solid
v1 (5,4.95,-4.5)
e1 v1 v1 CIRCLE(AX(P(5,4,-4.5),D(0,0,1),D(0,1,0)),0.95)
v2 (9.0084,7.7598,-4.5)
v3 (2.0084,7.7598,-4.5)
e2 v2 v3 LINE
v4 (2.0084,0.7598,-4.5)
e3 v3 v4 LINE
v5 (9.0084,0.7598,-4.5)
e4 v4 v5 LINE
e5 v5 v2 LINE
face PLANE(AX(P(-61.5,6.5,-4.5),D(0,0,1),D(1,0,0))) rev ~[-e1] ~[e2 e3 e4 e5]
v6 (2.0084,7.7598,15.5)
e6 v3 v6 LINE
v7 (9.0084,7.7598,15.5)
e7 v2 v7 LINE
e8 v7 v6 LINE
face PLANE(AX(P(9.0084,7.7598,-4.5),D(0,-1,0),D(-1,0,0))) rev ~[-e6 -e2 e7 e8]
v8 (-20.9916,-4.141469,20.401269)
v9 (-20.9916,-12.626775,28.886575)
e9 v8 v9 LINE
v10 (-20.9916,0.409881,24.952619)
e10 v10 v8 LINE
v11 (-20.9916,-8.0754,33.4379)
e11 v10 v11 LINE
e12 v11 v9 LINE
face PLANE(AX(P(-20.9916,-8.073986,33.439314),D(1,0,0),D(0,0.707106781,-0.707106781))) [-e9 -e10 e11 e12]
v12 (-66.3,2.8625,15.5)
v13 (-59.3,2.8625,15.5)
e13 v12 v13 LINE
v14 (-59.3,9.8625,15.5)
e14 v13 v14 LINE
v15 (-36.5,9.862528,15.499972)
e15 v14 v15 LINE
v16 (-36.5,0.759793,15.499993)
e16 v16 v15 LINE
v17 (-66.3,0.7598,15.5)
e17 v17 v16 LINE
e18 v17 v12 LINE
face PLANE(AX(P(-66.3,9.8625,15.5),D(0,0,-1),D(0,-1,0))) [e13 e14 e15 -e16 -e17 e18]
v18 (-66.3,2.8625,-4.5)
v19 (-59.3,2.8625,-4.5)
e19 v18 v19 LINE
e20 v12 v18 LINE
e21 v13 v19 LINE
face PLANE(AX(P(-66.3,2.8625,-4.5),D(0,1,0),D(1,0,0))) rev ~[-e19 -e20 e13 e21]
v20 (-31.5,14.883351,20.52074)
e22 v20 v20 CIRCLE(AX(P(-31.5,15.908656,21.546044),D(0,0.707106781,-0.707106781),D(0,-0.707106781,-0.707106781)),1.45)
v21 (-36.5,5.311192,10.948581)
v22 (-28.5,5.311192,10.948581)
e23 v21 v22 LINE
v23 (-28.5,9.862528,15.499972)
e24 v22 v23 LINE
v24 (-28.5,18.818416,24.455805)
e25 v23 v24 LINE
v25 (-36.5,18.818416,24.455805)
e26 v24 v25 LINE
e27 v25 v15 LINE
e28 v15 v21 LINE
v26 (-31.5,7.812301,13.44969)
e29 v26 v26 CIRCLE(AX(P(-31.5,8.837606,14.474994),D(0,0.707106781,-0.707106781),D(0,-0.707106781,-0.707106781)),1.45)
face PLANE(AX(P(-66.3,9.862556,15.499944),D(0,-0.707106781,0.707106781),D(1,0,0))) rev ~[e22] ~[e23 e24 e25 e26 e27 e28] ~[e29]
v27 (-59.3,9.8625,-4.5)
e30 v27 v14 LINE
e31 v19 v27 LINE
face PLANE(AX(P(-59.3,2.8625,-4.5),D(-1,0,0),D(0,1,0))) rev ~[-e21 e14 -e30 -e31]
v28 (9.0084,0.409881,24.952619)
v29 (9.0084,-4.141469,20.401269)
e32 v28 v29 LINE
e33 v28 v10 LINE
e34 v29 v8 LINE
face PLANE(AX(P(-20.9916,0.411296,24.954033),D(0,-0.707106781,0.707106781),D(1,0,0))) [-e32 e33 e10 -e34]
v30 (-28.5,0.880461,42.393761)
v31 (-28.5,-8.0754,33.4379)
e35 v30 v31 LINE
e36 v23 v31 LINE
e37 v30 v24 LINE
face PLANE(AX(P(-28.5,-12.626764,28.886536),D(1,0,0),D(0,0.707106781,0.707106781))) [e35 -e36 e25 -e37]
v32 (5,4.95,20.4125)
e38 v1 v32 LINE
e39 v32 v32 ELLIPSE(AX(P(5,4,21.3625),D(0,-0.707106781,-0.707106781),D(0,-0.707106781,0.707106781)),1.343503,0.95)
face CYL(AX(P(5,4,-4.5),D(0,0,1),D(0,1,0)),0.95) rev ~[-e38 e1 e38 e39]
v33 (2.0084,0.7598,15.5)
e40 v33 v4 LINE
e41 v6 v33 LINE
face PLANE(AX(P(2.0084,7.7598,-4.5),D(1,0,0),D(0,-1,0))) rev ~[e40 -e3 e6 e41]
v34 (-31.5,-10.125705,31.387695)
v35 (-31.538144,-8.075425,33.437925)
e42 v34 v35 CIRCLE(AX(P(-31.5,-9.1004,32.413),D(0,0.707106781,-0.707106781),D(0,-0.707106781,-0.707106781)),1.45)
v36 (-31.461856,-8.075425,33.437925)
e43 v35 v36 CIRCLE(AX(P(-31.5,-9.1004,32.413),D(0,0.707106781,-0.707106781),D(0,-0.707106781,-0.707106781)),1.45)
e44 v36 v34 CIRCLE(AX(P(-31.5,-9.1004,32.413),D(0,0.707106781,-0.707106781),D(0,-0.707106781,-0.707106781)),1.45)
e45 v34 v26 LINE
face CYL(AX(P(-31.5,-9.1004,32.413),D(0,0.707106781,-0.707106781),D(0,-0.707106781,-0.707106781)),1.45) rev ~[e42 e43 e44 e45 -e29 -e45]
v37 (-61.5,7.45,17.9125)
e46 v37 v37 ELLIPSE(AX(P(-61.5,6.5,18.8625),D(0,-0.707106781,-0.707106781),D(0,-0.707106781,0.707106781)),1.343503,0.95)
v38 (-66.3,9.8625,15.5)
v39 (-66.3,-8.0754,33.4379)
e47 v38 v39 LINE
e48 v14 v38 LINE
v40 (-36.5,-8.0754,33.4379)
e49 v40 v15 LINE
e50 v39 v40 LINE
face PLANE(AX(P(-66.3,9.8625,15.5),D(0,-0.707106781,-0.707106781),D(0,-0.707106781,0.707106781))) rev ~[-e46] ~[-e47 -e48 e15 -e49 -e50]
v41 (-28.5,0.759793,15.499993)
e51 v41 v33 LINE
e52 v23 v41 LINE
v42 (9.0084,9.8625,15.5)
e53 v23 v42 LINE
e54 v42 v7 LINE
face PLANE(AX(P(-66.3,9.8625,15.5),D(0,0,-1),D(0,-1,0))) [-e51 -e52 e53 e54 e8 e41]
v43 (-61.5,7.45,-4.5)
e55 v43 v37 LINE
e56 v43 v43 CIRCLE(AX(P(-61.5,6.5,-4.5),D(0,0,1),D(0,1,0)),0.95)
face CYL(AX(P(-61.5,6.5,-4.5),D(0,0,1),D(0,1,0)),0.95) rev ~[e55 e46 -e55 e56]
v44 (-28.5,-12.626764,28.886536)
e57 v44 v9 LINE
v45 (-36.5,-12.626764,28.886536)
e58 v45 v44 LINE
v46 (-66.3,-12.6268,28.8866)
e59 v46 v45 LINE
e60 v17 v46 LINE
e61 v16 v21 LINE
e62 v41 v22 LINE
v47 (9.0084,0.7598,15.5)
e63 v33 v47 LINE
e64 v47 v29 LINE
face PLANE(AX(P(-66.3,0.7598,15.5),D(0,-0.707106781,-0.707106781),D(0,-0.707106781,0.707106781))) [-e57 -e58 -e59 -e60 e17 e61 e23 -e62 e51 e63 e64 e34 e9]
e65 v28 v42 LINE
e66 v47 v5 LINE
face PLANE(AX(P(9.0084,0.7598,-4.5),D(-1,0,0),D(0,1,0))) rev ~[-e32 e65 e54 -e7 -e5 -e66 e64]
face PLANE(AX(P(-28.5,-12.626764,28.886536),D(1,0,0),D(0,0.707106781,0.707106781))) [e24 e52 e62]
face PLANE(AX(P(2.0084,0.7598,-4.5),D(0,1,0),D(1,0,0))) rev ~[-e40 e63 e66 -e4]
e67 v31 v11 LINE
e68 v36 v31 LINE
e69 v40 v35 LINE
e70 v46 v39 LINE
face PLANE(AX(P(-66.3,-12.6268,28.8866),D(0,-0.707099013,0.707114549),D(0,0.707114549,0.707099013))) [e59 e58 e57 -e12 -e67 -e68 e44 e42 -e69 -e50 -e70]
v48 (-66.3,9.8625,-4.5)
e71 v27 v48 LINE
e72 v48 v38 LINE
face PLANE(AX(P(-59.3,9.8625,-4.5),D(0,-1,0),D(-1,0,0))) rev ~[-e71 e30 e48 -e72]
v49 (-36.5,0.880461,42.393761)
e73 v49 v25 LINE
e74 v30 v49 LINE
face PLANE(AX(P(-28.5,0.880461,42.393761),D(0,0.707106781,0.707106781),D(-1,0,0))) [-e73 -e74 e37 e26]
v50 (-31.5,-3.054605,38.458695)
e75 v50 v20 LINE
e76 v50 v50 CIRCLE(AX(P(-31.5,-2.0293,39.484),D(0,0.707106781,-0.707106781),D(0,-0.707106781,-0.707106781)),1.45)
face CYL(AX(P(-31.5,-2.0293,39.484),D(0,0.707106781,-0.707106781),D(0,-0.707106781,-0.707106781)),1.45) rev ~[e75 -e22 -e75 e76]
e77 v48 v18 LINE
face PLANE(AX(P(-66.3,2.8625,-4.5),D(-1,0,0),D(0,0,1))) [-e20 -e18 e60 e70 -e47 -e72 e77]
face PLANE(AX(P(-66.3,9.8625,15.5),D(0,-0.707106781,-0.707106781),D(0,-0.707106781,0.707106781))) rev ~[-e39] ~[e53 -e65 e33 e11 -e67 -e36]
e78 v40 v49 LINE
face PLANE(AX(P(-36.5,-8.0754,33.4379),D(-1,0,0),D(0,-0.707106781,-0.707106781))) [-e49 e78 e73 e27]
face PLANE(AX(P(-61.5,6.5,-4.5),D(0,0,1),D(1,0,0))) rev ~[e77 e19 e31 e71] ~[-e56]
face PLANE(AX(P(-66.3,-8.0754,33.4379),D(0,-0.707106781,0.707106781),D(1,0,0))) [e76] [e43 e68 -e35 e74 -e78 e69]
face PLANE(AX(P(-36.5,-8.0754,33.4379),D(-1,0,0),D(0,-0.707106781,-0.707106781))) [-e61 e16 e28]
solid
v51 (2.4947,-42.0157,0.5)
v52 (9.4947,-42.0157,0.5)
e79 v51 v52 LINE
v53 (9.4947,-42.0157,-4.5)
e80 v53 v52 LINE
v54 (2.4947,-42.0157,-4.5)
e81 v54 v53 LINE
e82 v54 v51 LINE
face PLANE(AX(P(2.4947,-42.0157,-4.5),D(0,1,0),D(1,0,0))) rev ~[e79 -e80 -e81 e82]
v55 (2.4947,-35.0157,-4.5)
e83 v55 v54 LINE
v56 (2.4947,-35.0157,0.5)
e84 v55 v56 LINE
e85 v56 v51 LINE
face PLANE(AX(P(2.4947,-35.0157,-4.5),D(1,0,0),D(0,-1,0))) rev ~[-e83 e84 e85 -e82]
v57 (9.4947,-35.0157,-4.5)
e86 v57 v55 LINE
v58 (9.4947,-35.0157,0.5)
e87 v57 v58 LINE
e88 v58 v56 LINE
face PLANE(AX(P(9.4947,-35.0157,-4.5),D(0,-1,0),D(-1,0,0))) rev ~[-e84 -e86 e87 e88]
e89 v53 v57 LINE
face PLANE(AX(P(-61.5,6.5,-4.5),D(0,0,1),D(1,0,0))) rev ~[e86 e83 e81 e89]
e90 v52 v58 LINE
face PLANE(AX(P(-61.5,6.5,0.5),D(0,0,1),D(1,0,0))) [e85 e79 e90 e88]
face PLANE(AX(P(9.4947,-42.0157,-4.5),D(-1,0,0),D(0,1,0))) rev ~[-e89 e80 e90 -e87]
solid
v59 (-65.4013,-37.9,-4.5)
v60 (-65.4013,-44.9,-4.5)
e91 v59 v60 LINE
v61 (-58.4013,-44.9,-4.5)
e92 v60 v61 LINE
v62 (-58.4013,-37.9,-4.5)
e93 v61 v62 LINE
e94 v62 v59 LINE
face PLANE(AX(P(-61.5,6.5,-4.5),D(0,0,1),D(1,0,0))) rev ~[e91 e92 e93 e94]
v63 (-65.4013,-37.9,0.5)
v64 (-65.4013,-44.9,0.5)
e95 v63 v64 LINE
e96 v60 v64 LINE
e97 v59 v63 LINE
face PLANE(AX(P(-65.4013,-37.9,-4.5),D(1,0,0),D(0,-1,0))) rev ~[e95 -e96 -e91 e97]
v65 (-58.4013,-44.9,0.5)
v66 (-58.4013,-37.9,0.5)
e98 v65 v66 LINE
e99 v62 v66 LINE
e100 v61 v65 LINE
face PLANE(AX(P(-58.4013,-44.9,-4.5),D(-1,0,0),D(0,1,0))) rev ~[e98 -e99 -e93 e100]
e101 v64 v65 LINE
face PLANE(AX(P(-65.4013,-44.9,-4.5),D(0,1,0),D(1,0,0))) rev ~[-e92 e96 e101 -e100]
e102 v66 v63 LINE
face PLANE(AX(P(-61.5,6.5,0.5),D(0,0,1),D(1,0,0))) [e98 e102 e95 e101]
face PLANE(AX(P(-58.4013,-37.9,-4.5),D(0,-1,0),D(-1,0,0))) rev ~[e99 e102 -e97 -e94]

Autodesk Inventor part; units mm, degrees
ref_plane "YZ Plane" through (0, 0, 0) normal (1, 0, 0) x (0, 1, 0)
ref_plane "XZ Plane" through (0, 0, 0) normal (0, 1, 0) x (-1, 0, 0)
ref_plane "XY Plane" through (0, 0, 0) normal (0, 0, 1) x (1, 0, 0)
ref_plane "Work Plane1" through (-61.5, 6.5, -4.5) normal (0, 0, 1) x (1, 0, 0)
sketch "Sketch1" plane through (-61.5, 6.5, -4.5) normal (0, 0, 1) x (1, 0, 0)
  circle A0 centre (0, 0) radius 1.7 construction
  circle A1 centre (66.5, -2.5) radius 1.1 construction
  circle A2 centre (66.5, -45.5) radius 1.1 construction
  circle A3 centre (0.5, -48) radius 1.7 construction
  line L0 (70.5084, 1.2598) -> (63.5084, 1.2598)
  line L1 (63.5084, 1.2598) -> (63.5084, -5.7402)
  line L2 (63.5084, -5.7402) -> (70.5084, -5.7402)
  line L3 (70.5084, -5.7402) -> (70.5084, 1.2598)
  circle A4 centre (68.0875, -0.9125) radius 1.1 construction
  line L4 (70.9947, -41.5157) -> (63.9947, -41.5157)
  line L5 (63.9947, -41.5157) -> (63.9947, -48.5157)
  line L6 (63.9947, -48.5157) -> (70.9947, -48.5157)
  line L7 (70.9947, -48.5157) -> (70.9947, -41.5157)
  circle A5 centre (69.675, 0.675) radius 1.1 construction
  line L8 (3.0987, -44.4) -> (-3.9013, -44.4)
  line L9 (-3.9013, -44.4) -> (-3.9013, -51.4)
  line L10 (-3.9013, -51.4) -> (3.0987, -51.4)
  line L11 (3.0987, -51.4) -> (3.0987, -44.4)
  circle A6 centre (71.2625, 2.2625) radius 1.1 construction
  line L12 (2.2, 3.3625) -> (-4.8, 3.3625)
  line L13 (-4.8, 3.3625) -> (-4.8, -3.6375)
  line L14 (-4.8, -3.6375) -> (2.2, -3.6375)
  line L15 (2.2, -3.6375) -> (2.2, 3.3625)
  point P0 (61.5, -6.5)
  point P1 (63.0875, -4.9125)
  point P2 (64.675, -3.325)
  point P3 (66.2625, -1.7375)
  dimension "d4" = 7
  dimension "d5" = 7
  dimension "d6" = 7
  dimension "d7" = 7
  dimension "d8" = 7
  dimension "d9" = 7
  dimension "d10" = 7
  dimension "d11" = 7
extrude "Extrusion1" add sketch "Sketch1" along normal blind 5
sketch "Sketch2" plane through (-61.5, 6.5, 0.5) normal (0, 0, 1) x (1, 0, 0)
  line L0 (70.5084, 1.2598) -> (63.5084, 1.2598) projected
  line L1 (63.5084, 1.2598) -> (63.5084, -5.7402) projected
  line L2 (63.5084, -5.7402) -> (70.5084, -5.7402) projected
  line L3 (70.5084, -5.7402) -> (70.5084, 1.2598) projected
  line L4 (-4.8, 3.3625) -> (-4.8, -3.6375) projected
  line L5 (-4.8, -3.6375) -> (2.2, -3.6375) projected
  line L6 (2.2, -3.6375) -> (2.2, 3.3625) projected
  line L7 (2.2, 3.3625) -> (-4.8, 3.3625) projected
  point P0 (61.5, -6.5)
extrude "Extrusion2" add sketch "Sketch2" along normal blind 15
sketch "Sketch3" plane through (-66.3, 2.8625, -4.5) normal (-1, 0, 0) x (0, 0, 1)
  line L0 (0, 4.8973) -> (0, -2.1027) projected
  line L1 (0, -2.1027) -> (20, -2.1027) projected
  line L2 (20, 4.8973) -> (20, -2.1027) projected
  line L3 (0, 4.8973) -> (20, 4.8973) projected
  line L4 (0, 0) -> (0, 7) projected
  line L5 (0, 0) -> (20, 0) projected
  line L6 (20, 7) -> (20, 0) projected
  line L7 (0, 7) -> (20, 7) projected
  line L8 (0, -2.1027) -> (20, -2.1027) projected
  line L9 (20, -2.1027) -> (20, 7)
  line L10 (0, 7) -> (20, 7) projected
  line L11 (20, 7) -> (24.5513, 2.4487)
  line L12 (20, 7) -> (26.4366, 7) construction
  line L13 (24.5513, 2.4487) -> (20, -2.1027)
  line L14 (7.5, -41.3758) -> (74.2482, 25.3723) construction
  line L15 (24.5513, 2.4487) -> (20, -2.1027)
  line L16 (20, -2.1027) -> (33.3866, -15.4893)
  line L17 (33.3866, -15.4893) -> (37.9379, -10.9379)
  line L18 (37.9379, -10.9379) -> (24.5513, 2.4487)
  point P0 (4.5, -2.8625)
  dimension "d16" = 45
extrude "Extrusion3" add sketch "Sketch3" against normal up to surface (75.3084 mm away) contours L6 L11 L13 L2 | L13 L18 L17 L16
sketch "Sketch4" plane through (-61.5, 6.5, -4.5) normal (0, 0, -1) x (-1, 0, 0)
  circle A0 centre (-66.5, -2.5) radius 1.1 projected
  circle A1 centre (0, 0) radius 1.1 projected
  point P0 (-61.5, -6.5)
hole "Hole1" at (5, 4, -4.5) at (-61.5, 6.5, -4.5) direction (0, 0, 1) diameter 1.9 end through all
sketch "Sketch5" plane through (-66.3, -8.0754, 33.4379) normal (0, 0.7071068, 0.7071068) x (1, 0, 0)
  line L0 (31.8, 0) -> (67.6266, 0) projected
  line L1 (75.3084, 25.3681) -> (75.3084, 0) projected
  line L2 (75.3084, 0) -> (45.3084, 0)
  line L3 (45.3084, 0) -> (45.3084, 12)
  line L4 (45.3084, 12) -> (75.3084, 12)
  line L5 (75.3084, 12) -> (75.3084, 0)
  point P0 (66.3, 29.3544)
  dimension "d28" = 30
  dimension "d29" = 12
extrude "Extrusion5" cut sketch "Sketch5" against normal up to surface (6.4366 mm away)
sketch "Sketch6" plane through (-66.3, -8.0754, 33.4379) normal (0, -0.7071068, 0.7071068) x (1, 0, 0)
  line L0 (45.3084, -6.4366) -> (45.3084, 0) projected
  line L1 (0, 0) -> (45.3084, 0) projected
  line L2 (0, -6.4366) -> (0, 0) projected
  line L3 (0, -6.4366) -> (45.3084, -6.4366) projected
  circle A0 centre (34.6, 8.3505) radius 1.6 projected
  circle A1 centre (34.6, -1.6495) radius 1.6 projected
  line L4 (29.8, -43.0457) -> (29.8, 51.3505) construction
  line L5 (37.8, 3.4505) -> (37.8, -42.9495) construction
  line L6 (0, -6.4366) -> (45.3084, -6.4366) construction
  line L7 (29.8, -6.4366) -> (37.8, -6.4366) construction
  line L8 (37.8, -6.4366) -> (37.8, 12.6655) construction
  line L9 (37.8, 12.6655) -> (29.8, 12.6655) construction
  line L10 (29.8, 12.6655) -> (29.8, -6.4366) construction
  line L11 (29.8, -6.4366) -> (37.8, -6.4366)
  line L12 (37.8, -6.4366) -> (37.8, 12.6655)
  line L13 (37.8, 12.6655) -> (29.8, 12.6655)
  line L14 (29.8, 12.6655) -> (29.8, -6.4366)
  point P0 (66.3, -17.934)
extrude "Extrusion6" add sketch "Sketch6" against normal up to surface (25.3681 mm away) contours L3 L14 L1 L12 | L1 L14 L13 L12 | A0 | A1
sketch "Sketch7" plane through (-66.3, -12.6268, 28.8866) normal (0, -0.7071068, 0.7071068) x (1, 0, 0)
  circle A0 centre (34.8, 4.987) radius 2.65 projected
  circle A1 centre (34.8, 14.987) radius 2.65 projected
  point P0 (66.3, -11.4974)
hole "Hole2" at (-31.5, -9.1004, 32.413) at (-31.5, -2.0293, 39.484) direction (0, 0.7071068, -0.7071068) diameter 2.9 end through all
properties part number "30_CUBE_openSIM_DLP200EVM_Holder"
